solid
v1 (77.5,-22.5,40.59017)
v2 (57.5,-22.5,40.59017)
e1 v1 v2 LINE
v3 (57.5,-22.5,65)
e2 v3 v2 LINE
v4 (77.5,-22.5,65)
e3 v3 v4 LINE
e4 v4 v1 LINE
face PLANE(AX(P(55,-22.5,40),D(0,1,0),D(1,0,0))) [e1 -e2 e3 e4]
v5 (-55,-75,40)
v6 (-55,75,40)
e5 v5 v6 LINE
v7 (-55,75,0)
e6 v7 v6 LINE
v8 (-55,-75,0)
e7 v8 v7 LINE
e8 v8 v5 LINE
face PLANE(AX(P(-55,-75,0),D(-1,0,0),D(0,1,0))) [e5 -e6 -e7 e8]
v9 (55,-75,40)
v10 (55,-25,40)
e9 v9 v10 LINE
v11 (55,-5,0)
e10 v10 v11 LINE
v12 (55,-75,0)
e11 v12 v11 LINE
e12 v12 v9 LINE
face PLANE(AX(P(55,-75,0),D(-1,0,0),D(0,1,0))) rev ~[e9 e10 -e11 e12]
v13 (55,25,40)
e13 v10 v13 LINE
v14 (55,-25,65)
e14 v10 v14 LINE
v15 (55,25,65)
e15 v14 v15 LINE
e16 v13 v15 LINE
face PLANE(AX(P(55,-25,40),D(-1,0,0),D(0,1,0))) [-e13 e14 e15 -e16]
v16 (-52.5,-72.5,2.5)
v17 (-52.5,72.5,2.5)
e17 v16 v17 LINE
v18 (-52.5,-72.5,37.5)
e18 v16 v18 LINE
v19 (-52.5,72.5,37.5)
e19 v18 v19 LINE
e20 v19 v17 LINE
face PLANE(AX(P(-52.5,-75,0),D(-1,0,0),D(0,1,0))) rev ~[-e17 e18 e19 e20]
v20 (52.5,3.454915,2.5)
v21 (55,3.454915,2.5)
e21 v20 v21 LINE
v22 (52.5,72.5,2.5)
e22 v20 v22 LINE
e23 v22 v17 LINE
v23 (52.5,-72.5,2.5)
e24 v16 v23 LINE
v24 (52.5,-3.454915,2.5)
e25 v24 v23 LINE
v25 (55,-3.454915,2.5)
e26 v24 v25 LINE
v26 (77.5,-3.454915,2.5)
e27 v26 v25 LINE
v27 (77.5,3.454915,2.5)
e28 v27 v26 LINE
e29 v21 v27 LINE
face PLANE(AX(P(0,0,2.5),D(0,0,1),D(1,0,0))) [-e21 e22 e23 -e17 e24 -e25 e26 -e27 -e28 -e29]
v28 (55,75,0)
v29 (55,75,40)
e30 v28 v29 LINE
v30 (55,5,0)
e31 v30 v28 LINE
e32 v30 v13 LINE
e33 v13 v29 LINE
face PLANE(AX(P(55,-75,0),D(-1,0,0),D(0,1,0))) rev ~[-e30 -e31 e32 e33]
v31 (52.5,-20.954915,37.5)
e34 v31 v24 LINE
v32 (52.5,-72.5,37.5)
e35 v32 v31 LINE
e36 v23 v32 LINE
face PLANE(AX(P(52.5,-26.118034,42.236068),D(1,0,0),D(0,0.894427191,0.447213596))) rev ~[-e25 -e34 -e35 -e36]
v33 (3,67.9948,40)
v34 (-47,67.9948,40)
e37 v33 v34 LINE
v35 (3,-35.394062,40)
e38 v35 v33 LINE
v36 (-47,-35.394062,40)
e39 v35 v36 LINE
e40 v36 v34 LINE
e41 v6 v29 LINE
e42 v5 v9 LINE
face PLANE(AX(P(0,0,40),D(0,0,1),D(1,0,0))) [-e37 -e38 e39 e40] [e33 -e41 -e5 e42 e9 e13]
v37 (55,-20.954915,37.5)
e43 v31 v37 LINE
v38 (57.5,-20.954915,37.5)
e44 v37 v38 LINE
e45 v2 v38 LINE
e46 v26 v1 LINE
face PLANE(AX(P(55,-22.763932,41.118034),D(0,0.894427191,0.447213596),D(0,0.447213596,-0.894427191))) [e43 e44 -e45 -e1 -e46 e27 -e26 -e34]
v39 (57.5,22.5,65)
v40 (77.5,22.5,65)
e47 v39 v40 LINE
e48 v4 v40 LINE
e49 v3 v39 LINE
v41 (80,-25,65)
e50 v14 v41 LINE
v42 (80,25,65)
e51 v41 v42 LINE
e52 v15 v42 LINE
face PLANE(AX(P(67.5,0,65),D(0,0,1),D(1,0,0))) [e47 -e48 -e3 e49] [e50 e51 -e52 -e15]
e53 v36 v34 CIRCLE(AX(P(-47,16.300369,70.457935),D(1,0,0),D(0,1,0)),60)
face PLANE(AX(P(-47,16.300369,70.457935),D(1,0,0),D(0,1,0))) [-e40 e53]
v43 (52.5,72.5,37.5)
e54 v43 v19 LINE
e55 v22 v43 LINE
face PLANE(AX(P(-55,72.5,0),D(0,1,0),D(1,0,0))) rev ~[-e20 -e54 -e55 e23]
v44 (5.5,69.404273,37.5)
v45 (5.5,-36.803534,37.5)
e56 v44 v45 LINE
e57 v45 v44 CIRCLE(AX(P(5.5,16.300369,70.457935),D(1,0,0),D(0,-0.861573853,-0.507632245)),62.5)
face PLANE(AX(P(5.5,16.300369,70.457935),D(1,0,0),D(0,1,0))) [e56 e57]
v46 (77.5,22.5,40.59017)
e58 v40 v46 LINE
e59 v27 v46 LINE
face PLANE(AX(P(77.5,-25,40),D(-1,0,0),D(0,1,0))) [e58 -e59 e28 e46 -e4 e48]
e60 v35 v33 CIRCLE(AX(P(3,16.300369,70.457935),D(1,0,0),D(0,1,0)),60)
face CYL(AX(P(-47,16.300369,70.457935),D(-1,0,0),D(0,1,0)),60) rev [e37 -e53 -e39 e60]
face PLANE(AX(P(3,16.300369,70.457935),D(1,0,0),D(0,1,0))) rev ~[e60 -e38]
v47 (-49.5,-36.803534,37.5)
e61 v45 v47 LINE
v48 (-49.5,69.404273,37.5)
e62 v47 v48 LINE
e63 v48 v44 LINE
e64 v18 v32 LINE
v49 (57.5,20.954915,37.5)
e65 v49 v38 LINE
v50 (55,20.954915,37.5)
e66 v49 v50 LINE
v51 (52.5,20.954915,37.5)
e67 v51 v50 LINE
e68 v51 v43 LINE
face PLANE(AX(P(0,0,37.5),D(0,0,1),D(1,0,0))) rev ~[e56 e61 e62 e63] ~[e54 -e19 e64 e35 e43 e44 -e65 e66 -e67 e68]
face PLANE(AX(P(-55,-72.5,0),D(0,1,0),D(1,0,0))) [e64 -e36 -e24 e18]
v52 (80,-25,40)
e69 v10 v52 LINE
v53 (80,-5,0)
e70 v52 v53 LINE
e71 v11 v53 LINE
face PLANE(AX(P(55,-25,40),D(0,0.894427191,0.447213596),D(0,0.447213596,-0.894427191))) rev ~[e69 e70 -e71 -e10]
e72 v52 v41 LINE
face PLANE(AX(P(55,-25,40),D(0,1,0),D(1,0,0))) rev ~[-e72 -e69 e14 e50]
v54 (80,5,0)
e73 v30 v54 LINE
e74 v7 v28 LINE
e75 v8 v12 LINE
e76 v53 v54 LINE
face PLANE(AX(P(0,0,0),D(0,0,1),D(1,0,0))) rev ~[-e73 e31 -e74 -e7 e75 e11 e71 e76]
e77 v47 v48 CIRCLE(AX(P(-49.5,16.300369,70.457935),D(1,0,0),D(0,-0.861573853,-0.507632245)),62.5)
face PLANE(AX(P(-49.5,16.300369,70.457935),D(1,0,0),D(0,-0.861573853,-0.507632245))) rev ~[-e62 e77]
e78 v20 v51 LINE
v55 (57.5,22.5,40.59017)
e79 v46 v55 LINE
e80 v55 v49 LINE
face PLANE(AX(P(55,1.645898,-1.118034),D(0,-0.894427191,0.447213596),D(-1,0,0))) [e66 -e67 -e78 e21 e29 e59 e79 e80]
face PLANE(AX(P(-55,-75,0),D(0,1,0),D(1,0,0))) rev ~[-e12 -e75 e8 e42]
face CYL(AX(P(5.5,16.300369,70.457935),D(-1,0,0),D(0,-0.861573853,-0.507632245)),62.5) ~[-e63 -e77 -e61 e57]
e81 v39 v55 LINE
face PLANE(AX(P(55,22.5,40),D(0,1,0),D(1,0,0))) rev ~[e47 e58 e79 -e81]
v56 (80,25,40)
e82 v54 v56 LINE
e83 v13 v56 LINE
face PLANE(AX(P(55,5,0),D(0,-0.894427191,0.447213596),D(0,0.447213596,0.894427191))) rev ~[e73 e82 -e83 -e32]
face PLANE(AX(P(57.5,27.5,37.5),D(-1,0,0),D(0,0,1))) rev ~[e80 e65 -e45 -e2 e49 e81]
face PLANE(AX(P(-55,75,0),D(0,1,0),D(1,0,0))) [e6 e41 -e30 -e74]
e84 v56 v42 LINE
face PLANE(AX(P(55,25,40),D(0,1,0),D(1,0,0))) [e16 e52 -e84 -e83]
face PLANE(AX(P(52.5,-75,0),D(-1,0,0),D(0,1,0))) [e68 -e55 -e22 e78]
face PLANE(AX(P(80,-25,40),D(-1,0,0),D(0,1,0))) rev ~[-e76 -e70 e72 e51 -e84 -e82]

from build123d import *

# Parameters (mm, degrees)
F0_W         = 110
F0_H         = 150
F1_DEPTH     = 40
F3_R         = 60
F4_DEPTH     = 50
F6_DEPTH     = 25
F7_W         = 25
F7_H         = 50
F8_DEPTH     = 25
F9_T         = 2.5
F9_T3_DEPTH  = 49.72135955
F9_T5_DEPTH  = 55
F9_T7_DEPTH  = 49.72135955
F9_T10_ANGLE = 118.9875137878
F9_T12_ANGLE = 118.9875137878


# Not quite as in the source:
# - a shell that OpenCascade refuses in one call is made with other operations: the cavity is built on its own and cut out


with BuildPart() as f1:
    # F0 (on Top) → F1 (new body)
    with BuildSketch(Plane.XY):
        Rectangle(F0_W, F0_H)
    extrude(amount=F1_DEPTH)

    # F3 (on offset) → F4 (cut)
    with BuildSketch(Plane.YZ.offset(-47)):
        with Locations((16.3003693058, 70.4579347266)):
            Circle(F3_R)
    extrude(amount=F4_DEPTH, mode=Mode.SUBTRACT)

    # F5 (on face) → F6 (join)
    with BuildSketch(Plane.YZ.offset(55)):
        Polygon((-5, 0), (5, 0), (25, 40), (-25, 40), align=None)
    extrude(amount=F6_DEPTH)

    # F7 (on face) → F8 (join)
    with BuildSketch(Plane.XY.offset(40)):
        with Locations((67.5, 0)):
            Rectangle(F7_W, F7_H)
    extrude(amount=F8_DEPTH)

    # F9: shell of thickness 2.5, made by hand


with BuildPart() as f9_core1:
    # F9_t2: copy of F1
    add(f1.part)

    # the walls: a layer under each face that stays
    f9_faces = [f9_core1.faces().sort_by_distance(p)[0] for p in [
        (0, -75, 20),
        (-55, 0, 20),
        (55, -40, 20),
        (12.5, 0, 0),
        (-36.6666666667, -50, 40),
        (0, 75, 20),
        (67.5, -15, 20),
        (80, 0, 32.5),
        (67.5, 15, 20),
        (55, 40, 20),
        (55, 0, 52.5),
        (3, 16.3003693058, 25.2289673633),
        (-22, 16.3003693058, 10.4579347266),
        (-47, 16.3003693058, 25.2289673633),
        (67.5, -25, 52.5),
        (67.5, 25, 52.5),
    ]]
    thicken(f9_faces, amount=-F9_T, mode=Mode.SUBTRACT)

    # F9_s4 → F9_t3 (cut)
    with BuildSketch(Plane(origin=(0, -22.1180339887, 44.2360679775), x_dir=(1, 0, 0), z_dir=(0, 0.4472135955, -0.894427191))):
        Polygon((55.025, 4.497135955), (52.5, 4.472135955), (52.5, 1.972135955), (55, 1.972135955), align=None)
    extrude(amount=F9_T3_DEPTH, mode=Mode.SUBTRACT)

    # F9_s6 → F9_t5 (cut)
    with BuildSketch(Plane.XZ.offset(-27.5)):
        Polygon((54.975, 40.025), (55, 37.5), (57.5, 37.5), (57.5, 40), align=None)
    extrude(amount=F9_T5_DEPTH, mode=Mode.SUBTRACT)

    # F9_s8 → F9_t7 (cut)
    with BuildSketch(Plane(origin=(0, -0.1180339887, -0.2360679775), x_dir=(1, 0, 0), z_dir=(0, 0.4472135955, 0.894427191))):
        Polygon((55.025, 4.497135955), (55, 1.972135955), (52.5, 1.972135955), (52.5, 4.472135955), align=None)
    extrude(amount=F9_T7_DEPTH, mode=Mode.SUBTRACT)

    # F9_s9 → F9_t10 (revolve, cut)
    with BuildSketch(Plane(origin=(0, -26.6152201498, 45.172421505), x_dir=(1, 0, 0), z_dir=(0, -0.5076322454, 0.8615738525))):
        Polygon((2.975, -10.1643084047), (5.5, -10.1893084047), (5.5, -12.6893084047), (3, -12.6893084047), align=None)
    revolve(axis=Axis((3, 16.3003693058, 70.4579347266), (1, 0, 0)), revolution_arc=F9_T10_ANGLE, mode=Mode.SUBTRACT)

    # F9_s11 → F9_t12 (revolve, cut)
    with BuildSketch(Plane(origin=(0, -26.6152201498, 45.172421505), x_dir=(1, 0, 0), z_dir=(0, -0.5076322454, 0.8615738525))):
        Polygon((-46.975, -10.1643084047), (-47, -12.6893084047), (-49.5, -12.6893084047), (-49.5, -10.1893084047), align=None)
    revolve(axis=Axis((-47, 16.3003693058, 70.4579347266), (1, 0, 0)), revolution_arc=F9_T12_ANGLE, mode=Mode.SUBTRACT)


with BuildPart() as f1_1:
    add(f1.part)

    # what is left inside the walls is the cavity
    f9_cavity = [f9_core1.part.solids().sort_by_distance(p)[0] for p in [
        (12.5, -24.166667, 2.525),
    ]]
    add(f9_cavity, mode=Mode.SUBTRACT)


solid = f1_1.part
